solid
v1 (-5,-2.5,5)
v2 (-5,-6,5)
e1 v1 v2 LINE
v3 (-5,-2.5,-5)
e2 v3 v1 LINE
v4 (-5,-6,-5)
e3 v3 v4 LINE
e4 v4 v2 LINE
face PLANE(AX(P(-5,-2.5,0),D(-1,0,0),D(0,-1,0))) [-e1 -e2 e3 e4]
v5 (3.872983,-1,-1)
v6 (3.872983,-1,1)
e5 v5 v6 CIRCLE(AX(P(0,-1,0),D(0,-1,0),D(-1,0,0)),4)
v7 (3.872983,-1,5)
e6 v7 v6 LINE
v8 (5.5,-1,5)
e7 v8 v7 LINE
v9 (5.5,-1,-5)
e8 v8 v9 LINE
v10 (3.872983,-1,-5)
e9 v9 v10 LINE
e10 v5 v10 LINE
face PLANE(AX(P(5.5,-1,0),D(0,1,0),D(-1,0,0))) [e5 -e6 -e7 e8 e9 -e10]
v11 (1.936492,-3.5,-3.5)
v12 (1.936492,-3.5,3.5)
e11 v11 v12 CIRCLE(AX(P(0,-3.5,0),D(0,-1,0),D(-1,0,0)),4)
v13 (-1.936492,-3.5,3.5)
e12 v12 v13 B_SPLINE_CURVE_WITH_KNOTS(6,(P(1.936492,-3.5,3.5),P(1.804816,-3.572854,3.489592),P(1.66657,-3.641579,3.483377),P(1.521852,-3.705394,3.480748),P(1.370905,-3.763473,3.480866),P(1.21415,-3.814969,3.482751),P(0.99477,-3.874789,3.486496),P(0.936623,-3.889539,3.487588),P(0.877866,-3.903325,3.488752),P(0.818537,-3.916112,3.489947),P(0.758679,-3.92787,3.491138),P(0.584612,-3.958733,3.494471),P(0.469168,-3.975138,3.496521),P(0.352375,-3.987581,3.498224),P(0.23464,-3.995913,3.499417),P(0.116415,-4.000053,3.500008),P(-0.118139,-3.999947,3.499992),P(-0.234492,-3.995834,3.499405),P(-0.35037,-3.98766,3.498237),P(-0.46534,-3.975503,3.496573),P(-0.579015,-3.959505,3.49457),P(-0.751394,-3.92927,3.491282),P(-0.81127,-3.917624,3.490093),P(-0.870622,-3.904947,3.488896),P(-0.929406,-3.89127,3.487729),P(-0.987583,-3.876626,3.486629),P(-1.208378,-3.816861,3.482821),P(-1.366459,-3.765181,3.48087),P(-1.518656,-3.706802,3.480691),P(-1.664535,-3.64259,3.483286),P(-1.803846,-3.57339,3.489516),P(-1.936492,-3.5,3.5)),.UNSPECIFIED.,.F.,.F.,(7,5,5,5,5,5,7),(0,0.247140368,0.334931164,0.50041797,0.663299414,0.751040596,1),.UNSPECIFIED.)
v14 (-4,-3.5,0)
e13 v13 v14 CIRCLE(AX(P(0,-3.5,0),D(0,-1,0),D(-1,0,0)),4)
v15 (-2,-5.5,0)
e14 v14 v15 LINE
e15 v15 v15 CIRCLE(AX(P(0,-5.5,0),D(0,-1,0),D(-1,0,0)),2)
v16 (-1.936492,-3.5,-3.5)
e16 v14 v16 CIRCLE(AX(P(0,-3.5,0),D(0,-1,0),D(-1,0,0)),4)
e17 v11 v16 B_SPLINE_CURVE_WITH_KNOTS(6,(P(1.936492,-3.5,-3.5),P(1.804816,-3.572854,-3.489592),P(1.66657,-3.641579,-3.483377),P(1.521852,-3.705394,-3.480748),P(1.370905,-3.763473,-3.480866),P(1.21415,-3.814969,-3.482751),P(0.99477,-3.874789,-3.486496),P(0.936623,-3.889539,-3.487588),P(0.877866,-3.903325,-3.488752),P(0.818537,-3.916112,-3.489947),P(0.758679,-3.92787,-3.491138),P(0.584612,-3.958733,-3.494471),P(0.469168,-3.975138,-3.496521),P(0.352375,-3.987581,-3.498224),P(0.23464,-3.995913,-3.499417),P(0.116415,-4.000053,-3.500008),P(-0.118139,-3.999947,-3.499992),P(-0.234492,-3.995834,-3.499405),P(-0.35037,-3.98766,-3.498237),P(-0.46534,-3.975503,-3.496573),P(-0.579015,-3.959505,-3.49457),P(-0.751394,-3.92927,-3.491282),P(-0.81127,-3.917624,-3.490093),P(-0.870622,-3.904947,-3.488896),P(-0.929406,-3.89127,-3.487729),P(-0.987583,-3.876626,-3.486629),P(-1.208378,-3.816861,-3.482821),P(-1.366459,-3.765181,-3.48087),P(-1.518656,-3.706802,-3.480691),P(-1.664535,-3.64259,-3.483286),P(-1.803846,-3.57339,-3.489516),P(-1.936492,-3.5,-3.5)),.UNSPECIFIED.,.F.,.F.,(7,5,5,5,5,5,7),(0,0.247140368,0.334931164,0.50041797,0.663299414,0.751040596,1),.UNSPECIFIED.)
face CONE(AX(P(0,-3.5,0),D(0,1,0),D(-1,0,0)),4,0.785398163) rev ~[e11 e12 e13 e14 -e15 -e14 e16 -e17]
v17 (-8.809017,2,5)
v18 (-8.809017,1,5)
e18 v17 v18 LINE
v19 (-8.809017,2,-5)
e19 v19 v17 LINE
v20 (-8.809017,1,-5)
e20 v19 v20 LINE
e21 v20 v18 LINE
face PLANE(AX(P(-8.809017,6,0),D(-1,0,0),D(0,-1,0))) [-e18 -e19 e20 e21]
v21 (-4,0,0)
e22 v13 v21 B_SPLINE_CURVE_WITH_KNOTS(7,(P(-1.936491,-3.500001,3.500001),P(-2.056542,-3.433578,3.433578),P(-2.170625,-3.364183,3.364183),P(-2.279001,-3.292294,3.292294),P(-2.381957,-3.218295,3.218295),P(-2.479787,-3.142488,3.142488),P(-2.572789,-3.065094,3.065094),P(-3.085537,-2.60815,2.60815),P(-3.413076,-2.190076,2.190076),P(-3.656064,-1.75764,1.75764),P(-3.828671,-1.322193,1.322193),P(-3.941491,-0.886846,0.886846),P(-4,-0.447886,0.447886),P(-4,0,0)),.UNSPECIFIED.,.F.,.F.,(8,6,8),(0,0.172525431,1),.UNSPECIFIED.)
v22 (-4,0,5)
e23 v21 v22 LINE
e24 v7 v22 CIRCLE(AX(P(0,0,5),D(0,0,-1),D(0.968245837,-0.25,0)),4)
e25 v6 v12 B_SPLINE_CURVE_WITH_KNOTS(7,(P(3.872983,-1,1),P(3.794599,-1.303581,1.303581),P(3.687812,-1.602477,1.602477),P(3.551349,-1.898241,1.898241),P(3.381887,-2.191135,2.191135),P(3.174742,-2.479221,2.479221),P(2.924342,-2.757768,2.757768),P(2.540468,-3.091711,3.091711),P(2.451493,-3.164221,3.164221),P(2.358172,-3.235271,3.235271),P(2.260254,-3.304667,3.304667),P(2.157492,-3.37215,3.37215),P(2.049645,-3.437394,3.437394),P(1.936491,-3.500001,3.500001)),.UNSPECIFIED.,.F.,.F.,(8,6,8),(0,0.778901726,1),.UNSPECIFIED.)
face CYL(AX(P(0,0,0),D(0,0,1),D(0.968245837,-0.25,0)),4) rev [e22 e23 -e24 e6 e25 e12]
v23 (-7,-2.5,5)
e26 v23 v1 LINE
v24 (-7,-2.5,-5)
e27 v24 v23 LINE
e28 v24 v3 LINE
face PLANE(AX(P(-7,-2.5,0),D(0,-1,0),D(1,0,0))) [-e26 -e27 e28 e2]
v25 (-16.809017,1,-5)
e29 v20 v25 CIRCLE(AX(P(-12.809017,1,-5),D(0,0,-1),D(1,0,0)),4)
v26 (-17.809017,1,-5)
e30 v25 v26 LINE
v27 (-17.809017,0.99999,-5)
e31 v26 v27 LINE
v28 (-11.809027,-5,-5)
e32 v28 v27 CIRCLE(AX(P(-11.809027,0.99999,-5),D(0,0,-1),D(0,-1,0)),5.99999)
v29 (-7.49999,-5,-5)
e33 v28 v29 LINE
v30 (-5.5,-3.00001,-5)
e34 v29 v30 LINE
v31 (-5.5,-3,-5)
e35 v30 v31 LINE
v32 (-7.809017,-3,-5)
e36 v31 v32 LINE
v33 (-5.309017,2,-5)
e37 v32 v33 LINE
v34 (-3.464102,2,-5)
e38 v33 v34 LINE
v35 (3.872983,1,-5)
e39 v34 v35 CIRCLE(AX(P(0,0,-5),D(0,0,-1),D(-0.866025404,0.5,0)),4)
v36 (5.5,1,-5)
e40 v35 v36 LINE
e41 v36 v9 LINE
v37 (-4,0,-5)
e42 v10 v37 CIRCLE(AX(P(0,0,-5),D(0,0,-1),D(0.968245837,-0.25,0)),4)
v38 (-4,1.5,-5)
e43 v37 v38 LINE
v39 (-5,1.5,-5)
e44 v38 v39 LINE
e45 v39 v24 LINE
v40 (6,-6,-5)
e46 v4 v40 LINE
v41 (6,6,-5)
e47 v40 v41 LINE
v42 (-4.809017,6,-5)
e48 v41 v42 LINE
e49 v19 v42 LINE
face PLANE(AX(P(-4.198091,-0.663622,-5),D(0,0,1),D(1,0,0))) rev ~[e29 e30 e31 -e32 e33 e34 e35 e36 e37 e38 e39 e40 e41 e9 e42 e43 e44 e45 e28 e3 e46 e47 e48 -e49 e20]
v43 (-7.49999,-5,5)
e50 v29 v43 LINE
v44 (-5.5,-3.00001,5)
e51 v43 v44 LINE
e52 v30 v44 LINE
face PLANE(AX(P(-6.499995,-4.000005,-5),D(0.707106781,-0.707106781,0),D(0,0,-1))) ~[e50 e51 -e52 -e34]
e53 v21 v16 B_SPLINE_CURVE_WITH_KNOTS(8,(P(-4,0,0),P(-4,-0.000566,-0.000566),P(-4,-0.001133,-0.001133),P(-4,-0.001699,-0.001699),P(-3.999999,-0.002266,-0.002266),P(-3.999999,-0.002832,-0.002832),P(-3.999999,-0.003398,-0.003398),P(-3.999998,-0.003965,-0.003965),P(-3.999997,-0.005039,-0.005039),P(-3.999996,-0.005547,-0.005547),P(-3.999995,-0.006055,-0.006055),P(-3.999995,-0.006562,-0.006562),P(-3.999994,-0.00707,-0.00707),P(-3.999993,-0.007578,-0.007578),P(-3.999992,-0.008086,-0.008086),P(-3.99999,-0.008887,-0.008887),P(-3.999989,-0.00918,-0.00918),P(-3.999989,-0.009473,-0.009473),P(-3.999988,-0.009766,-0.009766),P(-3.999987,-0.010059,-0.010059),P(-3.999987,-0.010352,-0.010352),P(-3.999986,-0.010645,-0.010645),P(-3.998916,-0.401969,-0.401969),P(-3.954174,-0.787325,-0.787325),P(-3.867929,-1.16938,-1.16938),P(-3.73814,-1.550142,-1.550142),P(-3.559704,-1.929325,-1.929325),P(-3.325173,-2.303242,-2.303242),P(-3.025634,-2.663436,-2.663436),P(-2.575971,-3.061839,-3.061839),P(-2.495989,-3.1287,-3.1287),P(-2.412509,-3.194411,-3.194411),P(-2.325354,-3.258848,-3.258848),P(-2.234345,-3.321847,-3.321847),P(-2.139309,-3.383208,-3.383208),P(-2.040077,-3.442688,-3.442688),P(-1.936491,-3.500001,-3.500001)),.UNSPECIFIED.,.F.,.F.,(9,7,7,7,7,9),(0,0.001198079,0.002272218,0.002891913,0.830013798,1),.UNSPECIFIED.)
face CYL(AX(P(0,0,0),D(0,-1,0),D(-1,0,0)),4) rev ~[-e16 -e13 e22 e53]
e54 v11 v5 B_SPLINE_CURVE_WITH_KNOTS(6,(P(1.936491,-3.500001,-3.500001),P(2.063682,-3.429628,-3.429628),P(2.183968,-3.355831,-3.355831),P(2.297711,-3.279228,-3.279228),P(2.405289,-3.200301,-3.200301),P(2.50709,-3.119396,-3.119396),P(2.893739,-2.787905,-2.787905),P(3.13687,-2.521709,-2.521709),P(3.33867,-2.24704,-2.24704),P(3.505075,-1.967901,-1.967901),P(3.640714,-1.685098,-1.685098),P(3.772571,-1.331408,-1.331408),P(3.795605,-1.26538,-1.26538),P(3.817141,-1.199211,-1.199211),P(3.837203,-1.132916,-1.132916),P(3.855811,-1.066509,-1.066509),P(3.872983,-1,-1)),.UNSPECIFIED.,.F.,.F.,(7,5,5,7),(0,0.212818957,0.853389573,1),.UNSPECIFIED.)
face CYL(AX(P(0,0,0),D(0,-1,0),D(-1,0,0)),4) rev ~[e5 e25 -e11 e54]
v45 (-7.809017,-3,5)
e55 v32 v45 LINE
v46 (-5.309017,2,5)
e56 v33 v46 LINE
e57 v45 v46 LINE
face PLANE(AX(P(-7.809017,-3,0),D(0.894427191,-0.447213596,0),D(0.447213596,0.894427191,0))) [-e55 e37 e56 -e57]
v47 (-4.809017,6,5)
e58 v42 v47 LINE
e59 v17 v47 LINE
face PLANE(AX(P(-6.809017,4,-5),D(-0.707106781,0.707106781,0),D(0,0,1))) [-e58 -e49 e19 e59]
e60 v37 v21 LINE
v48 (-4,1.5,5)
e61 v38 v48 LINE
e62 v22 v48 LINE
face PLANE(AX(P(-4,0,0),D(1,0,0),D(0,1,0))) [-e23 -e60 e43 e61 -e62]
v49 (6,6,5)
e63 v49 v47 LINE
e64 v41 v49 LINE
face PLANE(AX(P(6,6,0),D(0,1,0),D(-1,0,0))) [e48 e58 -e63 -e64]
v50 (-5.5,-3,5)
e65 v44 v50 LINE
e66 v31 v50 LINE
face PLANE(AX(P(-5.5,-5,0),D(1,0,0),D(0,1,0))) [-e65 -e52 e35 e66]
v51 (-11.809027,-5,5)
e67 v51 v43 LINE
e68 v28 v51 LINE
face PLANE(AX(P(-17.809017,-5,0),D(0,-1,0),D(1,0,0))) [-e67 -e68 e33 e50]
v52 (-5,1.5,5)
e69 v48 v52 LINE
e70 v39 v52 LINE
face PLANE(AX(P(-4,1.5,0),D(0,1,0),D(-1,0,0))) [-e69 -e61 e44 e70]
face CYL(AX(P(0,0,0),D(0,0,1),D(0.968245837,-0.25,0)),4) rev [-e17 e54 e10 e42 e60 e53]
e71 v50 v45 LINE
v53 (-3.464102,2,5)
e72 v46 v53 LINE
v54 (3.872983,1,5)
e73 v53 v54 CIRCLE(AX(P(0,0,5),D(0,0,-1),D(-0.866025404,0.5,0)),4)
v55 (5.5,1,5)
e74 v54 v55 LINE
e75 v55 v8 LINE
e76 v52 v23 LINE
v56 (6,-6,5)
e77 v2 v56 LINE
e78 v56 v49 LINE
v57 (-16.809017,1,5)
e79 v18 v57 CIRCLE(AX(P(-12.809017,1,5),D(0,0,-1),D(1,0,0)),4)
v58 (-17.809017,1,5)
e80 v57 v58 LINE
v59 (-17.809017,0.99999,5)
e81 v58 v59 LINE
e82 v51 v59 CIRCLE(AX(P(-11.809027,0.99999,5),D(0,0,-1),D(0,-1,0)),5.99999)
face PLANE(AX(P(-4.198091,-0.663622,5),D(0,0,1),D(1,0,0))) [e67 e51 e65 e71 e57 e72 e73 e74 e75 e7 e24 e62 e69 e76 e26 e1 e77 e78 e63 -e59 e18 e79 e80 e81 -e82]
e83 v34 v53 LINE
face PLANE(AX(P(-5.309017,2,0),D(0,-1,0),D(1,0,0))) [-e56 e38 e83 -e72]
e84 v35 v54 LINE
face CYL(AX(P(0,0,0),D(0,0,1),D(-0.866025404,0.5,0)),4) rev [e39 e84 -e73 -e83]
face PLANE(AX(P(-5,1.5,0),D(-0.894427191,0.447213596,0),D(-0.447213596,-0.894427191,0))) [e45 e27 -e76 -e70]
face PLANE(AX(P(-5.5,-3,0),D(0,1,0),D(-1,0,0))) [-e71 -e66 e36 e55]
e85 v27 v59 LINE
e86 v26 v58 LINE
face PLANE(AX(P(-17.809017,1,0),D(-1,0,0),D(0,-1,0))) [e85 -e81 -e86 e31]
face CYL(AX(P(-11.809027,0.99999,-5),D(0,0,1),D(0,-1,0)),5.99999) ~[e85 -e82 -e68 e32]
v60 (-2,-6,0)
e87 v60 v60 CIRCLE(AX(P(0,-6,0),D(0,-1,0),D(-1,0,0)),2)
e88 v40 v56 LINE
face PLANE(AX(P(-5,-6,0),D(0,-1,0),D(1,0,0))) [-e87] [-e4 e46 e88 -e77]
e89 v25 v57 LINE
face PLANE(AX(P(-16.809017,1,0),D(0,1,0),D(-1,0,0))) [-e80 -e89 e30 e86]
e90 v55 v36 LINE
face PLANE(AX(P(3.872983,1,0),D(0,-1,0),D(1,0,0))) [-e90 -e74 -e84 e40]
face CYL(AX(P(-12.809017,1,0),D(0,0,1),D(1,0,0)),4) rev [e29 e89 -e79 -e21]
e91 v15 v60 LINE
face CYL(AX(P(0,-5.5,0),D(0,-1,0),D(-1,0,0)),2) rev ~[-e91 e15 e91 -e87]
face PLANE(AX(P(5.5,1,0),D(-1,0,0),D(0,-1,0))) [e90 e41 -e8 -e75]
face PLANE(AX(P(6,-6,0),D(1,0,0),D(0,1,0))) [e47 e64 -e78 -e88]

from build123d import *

# Parameters (mm, degrees)
F1_DEPTH = 5
F4_SIZE  = 1.99999
F5_R     = 5.99999
F6_SIZE  = 4


# Not quite as in the source:
# - a fillet or chamfer is up to 0.001 mm smaller than in the source, because OpenCascade refuses the exact size


with BuildPart() as f1:
    # F0 (on Top) → F1 (new body, symmetric)
    with BuildSketch(Plane.XY):
        with BuildLine():
            ThreePointArc((3.8729833462, -1), (-0.5040171699, -3.9681187851), (-4, 0))
            Line((-4, 0), (-4, 1.5))
            Line((-4, 1.5), (-5, 1.5))
            Line((-5, 1.5), (-7, -2.5))
            Line((-7, -2.5), (-5, -2.5))
            Line((-5, -2.5), (-5, -6))
            Line((-5, -6), (6, -6))
            Line((6, -6), (6, 6))
            Line((6, 6), (-8.8090169944, 6))
            Line((-8.8090169944, 6), (-8.8090169944, 1))
            ThreePointArc((-8.8090169944, 1), (-12.8090169944, -3), (-16.8090169944, 1))
            Line((-16.8090169944, 1), (-17.8090169944, 1))
            Line((-17.8090169944, 1), (-17.8090169944, -5))
            Line((-17.8090169944, -5), (-8.8090169944, -5))
            Line((-8.8090169944, -5), (-5.5, -5))
            Line((-5.5, -5), (-5.5, -3))
            Line((-5.5, -3), (-7.8090169944, -3))
            Line((-7.8090169944, -3), (-5.3090169944, 2))
            Line((-5.3090169944, 2), (-3.4641016151, 2))
            ThreePointArc((-3.4641016151, 2), (0.5401815135, 3.9633576589), (3.8729833462, 1))
            Line((3.8729833462, 1), (5.5, 1))
            Line((5.5, 1), (5.5, -1))
            Line((5.5, -1), (3.8729833462, -1))
        make_face()
    extrude(amount=F1_DEPTH, both=True)

    # F2 (on Top) → F3 (revolve, cut)
    with BuildSketch(Plane.XY):
        Polygon((0, 0), (-4, 0), (-4, -3.5), (-2, -5.5), (-2, -6), (0, -6), align=None)
    revolve(axis=Axis((0, -2.25, 0), (0, -1, 0)), mode=Mode.SUBTRACT)

    # F4 (size 2 in the source; OpenCascade refuses exactly that, so slightly less here)
    f4_edges = [f1.edges().sort_by_distance(p)[0] for p in [
        (-5.5, -5, 0),
    ]]
    chamfer(f4_edges, length=F4_SIZE)

    # F5 (radius 6 in the source; OpenCascade refuses exactly that, so slightly less here)
    f5_edges = [f1.edges().sort_by_distance(p)[0] for p in [
        (-17.809017, -5, 0),
    ]]
    fillet(f5_edges, radius=F5_R)

    # F6
    f6_edges = [f1.edges().sort_by_distance(p)[0] for p in [
        (-8.809017, 6, 0),
    ]]
    chamfer(f6_edges, length=F6_SIZE)


solid = f1.part
